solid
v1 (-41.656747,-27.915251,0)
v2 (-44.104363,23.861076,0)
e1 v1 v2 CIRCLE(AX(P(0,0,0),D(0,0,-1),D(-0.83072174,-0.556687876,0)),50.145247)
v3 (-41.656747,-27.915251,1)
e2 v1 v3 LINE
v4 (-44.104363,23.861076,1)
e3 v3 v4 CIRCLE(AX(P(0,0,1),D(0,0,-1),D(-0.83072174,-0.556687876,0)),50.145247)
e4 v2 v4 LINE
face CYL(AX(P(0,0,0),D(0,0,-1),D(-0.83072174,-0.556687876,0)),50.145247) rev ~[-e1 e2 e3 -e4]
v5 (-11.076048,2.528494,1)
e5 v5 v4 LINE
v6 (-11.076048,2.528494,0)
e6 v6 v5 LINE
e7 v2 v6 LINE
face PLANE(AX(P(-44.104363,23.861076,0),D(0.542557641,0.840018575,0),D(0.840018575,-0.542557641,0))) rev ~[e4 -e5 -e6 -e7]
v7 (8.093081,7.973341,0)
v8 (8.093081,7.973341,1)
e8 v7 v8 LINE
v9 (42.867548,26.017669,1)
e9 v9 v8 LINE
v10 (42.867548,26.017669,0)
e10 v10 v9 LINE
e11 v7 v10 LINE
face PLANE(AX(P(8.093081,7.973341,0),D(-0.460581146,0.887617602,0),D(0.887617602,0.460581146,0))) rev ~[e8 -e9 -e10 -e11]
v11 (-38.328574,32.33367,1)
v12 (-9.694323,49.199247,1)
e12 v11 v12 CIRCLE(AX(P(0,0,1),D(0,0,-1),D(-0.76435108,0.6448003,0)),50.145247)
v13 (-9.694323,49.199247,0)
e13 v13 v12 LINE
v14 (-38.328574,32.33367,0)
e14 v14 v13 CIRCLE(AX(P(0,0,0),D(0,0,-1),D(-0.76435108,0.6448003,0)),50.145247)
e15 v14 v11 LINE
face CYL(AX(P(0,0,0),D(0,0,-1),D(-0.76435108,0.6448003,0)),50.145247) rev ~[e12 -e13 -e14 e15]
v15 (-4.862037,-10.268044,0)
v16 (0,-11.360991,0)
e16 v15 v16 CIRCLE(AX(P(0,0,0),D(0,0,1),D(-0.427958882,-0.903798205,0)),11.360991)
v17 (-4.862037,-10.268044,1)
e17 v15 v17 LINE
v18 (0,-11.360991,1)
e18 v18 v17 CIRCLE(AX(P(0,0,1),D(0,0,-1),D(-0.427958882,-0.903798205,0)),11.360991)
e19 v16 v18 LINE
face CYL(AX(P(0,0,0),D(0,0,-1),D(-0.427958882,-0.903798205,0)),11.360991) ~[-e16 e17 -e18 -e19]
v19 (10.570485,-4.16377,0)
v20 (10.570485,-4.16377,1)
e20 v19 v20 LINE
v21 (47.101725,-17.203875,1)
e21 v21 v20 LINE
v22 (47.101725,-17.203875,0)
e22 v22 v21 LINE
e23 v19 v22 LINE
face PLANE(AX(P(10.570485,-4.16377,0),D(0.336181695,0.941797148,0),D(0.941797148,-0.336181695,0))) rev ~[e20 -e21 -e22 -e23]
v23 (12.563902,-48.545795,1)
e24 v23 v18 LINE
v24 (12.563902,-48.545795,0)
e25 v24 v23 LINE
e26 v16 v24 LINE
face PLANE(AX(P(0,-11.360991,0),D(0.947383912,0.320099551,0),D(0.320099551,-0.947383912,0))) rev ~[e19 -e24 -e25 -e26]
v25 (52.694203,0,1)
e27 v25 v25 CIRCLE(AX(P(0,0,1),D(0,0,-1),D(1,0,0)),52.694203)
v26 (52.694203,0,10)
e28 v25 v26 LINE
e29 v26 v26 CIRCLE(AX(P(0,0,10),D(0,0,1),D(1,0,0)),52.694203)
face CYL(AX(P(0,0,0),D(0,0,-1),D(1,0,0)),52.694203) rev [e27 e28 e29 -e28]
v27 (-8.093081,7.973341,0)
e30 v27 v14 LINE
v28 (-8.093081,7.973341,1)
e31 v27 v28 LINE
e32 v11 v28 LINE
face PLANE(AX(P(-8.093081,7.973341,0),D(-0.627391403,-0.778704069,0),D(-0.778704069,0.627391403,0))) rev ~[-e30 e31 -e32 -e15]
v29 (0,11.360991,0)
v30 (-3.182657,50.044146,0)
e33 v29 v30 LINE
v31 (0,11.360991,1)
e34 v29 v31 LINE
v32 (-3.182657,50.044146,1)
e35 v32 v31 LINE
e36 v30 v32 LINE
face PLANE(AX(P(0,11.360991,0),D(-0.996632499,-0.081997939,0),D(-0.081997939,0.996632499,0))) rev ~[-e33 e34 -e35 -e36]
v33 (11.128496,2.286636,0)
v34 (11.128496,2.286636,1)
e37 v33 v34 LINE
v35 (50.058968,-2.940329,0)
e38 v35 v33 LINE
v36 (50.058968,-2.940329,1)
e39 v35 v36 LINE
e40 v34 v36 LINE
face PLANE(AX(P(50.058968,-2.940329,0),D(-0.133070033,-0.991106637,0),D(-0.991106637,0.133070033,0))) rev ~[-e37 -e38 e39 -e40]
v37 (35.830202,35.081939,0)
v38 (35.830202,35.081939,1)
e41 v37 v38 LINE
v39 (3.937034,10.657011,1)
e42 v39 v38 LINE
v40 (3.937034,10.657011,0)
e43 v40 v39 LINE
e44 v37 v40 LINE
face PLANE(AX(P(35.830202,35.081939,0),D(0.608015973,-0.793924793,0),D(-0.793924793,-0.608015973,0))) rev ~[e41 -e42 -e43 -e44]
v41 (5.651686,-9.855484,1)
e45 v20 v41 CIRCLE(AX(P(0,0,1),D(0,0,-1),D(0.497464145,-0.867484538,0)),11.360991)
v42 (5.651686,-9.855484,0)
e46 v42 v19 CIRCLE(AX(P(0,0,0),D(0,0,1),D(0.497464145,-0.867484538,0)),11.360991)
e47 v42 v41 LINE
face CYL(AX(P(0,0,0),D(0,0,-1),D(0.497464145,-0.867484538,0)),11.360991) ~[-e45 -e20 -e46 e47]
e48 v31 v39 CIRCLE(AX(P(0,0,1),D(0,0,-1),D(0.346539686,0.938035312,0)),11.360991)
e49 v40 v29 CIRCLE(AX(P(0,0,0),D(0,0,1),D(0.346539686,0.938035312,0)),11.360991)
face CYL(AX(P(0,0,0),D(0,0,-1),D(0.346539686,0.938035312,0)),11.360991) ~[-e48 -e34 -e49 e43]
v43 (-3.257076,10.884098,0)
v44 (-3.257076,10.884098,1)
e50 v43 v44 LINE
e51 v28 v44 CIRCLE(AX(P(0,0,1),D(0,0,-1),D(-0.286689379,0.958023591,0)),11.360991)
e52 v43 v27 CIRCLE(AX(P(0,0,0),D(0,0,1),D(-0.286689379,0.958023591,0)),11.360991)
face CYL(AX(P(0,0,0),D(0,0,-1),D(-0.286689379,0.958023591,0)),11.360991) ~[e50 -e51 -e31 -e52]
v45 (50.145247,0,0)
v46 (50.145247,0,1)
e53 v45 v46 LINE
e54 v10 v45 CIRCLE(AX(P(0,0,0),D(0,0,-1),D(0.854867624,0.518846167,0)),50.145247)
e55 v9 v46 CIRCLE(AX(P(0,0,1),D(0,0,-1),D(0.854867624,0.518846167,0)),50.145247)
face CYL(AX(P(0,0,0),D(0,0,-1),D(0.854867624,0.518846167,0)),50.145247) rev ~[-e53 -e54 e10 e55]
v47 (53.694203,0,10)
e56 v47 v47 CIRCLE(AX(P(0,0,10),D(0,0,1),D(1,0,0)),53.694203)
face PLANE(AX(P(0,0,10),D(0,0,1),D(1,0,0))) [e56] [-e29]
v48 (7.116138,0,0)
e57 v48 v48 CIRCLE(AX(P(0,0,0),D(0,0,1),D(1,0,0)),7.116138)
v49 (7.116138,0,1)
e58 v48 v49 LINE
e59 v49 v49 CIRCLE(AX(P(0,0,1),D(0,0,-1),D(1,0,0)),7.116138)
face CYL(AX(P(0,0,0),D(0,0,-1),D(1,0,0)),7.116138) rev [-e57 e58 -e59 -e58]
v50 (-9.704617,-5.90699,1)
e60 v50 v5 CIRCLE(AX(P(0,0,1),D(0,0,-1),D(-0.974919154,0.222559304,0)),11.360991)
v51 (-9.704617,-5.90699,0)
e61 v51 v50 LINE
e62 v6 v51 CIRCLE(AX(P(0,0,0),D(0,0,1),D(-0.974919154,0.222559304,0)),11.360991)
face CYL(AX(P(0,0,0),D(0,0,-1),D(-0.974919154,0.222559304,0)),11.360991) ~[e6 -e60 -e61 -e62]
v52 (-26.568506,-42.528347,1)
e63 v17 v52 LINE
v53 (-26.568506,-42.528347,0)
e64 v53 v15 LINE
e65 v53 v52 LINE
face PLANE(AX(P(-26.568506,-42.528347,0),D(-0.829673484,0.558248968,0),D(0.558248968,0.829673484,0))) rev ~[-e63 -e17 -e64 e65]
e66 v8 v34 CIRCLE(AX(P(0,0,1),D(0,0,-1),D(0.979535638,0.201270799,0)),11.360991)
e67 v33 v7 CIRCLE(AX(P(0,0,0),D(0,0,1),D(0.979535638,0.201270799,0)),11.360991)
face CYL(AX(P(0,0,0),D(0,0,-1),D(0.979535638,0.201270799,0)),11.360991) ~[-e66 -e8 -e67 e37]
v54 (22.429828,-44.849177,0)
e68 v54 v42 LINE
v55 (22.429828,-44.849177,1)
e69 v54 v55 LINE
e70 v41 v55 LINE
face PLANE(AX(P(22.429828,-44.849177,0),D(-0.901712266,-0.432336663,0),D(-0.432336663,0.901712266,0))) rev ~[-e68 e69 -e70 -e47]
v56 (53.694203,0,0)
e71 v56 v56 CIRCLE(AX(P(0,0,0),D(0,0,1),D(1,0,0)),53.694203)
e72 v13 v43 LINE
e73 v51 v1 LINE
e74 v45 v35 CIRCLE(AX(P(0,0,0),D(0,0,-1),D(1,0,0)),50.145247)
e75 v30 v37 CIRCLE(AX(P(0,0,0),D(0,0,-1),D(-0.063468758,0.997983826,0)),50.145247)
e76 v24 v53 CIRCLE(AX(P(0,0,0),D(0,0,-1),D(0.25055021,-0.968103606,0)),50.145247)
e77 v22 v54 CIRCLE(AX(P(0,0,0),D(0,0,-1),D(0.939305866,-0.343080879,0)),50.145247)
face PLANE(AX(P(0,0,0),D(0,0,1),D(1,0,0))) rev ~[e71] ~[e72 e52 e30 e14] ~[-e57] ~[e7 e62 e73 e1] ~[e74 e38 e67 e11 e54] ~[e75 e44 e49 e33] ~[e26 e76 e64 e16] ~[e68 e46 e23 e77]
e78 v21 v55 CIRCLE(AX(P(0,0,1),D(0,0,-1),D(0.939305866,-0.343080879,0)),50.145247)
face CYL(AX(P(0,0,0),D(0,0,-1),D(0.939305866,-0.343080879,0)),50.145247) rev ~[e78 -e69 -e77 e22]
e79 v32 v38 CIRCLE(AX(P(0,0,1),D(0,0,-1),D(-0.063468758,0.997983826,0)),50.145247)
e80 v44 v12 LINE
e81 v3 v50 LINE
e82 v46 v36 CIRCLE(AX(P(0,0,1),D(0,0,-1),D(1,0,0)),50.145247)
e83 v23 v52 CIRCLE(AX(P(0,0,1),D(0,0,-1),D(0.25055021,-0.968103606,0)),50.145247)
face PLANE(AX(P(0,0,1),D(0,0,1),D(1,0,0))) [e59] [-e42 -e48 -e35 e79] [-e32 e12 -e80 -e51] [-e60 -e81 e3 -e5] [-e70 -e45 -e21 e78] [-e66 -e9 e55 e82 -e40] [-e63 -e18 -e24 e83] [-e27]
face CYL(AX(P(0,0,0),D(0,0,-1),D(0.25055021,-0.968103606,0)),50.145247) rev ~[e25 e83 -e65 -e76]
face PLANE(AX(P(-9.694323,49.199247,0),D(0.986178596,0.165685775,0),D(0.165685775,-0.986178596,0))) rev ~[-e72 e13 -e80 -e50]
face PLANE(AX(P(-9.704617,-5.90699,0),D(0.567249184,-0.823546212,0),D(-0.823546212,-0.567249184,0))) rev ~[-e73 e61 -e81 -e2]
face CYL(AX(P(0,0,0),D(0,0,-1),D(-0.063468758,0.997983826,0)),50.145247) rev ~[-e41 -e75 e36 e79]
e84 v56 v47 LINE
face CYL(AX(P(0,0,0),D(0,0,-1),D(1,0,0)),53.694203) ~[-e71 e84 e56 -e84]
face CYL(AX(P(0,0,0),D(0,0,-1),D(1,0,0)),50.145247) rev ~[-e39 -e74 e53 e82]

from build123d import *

# Parameters (mm, degrees)
F4_R      = 53.6942028964
F5_DEPTH  = 10
F6_T      = -1
F11_R     = 7.1329818057
F12_DEPTH = 62.1
F13_R     = 7.1161383354
F14_DEPTH = 79.5
F16_DEPTH = 25


# Not quite as in the source:
# - the program builds the solid bodies; features that only make, move or delete a surface that nothing else refers to are left out


with BuildPart() as f5:
    # F4 (on Top) → F5 (new body)
    with BuildSketch(Plane.XY):
        Circle(F4_R)
    extrude(amount=F5_DEPTH)

    # F6
    f6_openings = [f5.faces().sort_by_distance(p)[0] for p in [
        (0, 0, 10),
    ]]
    offset(amount=F6_T, openings=f6_openings)

    # F11 (on Top) → F12 (cut)
    with BuildSketch(Plane.XY):
        Circle(F11_R)
    extrude(amount=-F12_DEPTH, mode=Mode.SUBTRACT)

    # F13 (on Top) → F14 (cut)
    with BuildSketch(Plane.XY):
        Circle(F13_R)
    extrude(amount=F14_DEPTH, mode=Mode.SUBTRACT)

    # F15 (on face) → F16 (cut)
    with BuildSketch(Plane(origin=(0, 0, 0), x_dir=(1, 0, 0), z_dir=(0, 0, -1))):
        with BuildLine():
            Line((0, 11.3609913542), (12.56390222, 48.5457946048))
            ThreePointArc((12.56390222, 48.5457946048), (-7.6213284004, 49.5626993435), (-26.5685055521, 42.5283473172))
            Line((-26.5685055521, 42.5283473172), (-4.8620371636, 10.2680435901))
            ThreePointArc((-4.8620371636, 10.2680435901), (-2.4916831758, 11.0843871955), (0, 11.3609913542))
        make_face()
        with BuildLine():
            Line((-9.7046168543, 5.9069904572), (-41.6567469595, 27.9152511283))
            ThreePointArc((-41.6567469595, 27.9152511283), (-50.0893104585, 2.3678662526), (-44.1043633563, -23.8610759552))
            Line((-44.1043633563, -23.8610759552), (-11.0760480746, -2.5284943342))
            ThreePointArc((-11.0760480746, -2.5284943342), (-11.2137576056, 1.8231195549), (-9.7046168543, 5.9069904572))
        make_face()
        with BuildLine():
            ThreePointArc((-38.3285737992, -32.3336704276), (-25.4491957444, -43.2074559395), (-9.6943225855, -49.1992471732))
            Line((-9.6943225855, -49.1992471732), (-3.2570755528, -10.8840977298))
            ThreePointArc((-3.2570755528, -10.8840977298), (-5.8587236117, -9.733831835), (-8.0930813532, -7.9733405019))
            Line((-8.0930813532, -7.9733405019), (-38.3285737992, -32.3336704276))
        make_face()
        with BuildLine():
            ThreePointArc((-3.1826565415, -50.0441456131), (17.9564047347, -46.8200100577), (35.8302023129, -35.0819385869))
            Line((35.8302023129, -35.0819385869), (3.9370343752, -10.6570110668))
            ThreePointArc((3.9370343752, -10.6570110668), (1.9997392278, -11.183611562), (0, -11.3609913542))
            Line((0, -11.3609913542), (-3.1826565415, -50.0441456131))
        make_face()
        with BuildLine():
            ThreePointArc((42.8675483184, -26.0176692648), (48.2915604345, -13.5081828387), (50.1452471606, 0))
            ThreePointArc((50.1452471606, 0), (50.1236727364, 1.4707971358), (50.058968028, 2.9403286841))
            Line((50.058968028, 2.9403286841), (11.1284959107, -2.2866358071))
            ThreePointArc((11.1284959107, -2.2866358071), (10.0225700646, -5.3497863368), (8.0930813532, -7.9733405019))
            Line((8.0930813532, -7.9733405019), (42.8675483184, -26.0176692648))
        make_face()
        with BuildLine():
            Line((10.5704846038, 4.1637699011), (47.1017248223, 17.2038754811))
            ThreePointArc((47.1017248223, 17.2038754811), (37.4128970239, 33.3889345305), (22.4298275607, 44.8491766747))
            Line((22.4298275607, 44.8491766747), (5.6516858546, 9.8554843387))
            ThreePointArc((5.6516858546, 9.8554843387), (8.5958482365, 7.4285609403), (10.5704846038, 4.1637699011))
        make_face()
    extrude(amount=-F16_DEPTH, mode=Mode.SUBTRACT)


solid = f5.part
